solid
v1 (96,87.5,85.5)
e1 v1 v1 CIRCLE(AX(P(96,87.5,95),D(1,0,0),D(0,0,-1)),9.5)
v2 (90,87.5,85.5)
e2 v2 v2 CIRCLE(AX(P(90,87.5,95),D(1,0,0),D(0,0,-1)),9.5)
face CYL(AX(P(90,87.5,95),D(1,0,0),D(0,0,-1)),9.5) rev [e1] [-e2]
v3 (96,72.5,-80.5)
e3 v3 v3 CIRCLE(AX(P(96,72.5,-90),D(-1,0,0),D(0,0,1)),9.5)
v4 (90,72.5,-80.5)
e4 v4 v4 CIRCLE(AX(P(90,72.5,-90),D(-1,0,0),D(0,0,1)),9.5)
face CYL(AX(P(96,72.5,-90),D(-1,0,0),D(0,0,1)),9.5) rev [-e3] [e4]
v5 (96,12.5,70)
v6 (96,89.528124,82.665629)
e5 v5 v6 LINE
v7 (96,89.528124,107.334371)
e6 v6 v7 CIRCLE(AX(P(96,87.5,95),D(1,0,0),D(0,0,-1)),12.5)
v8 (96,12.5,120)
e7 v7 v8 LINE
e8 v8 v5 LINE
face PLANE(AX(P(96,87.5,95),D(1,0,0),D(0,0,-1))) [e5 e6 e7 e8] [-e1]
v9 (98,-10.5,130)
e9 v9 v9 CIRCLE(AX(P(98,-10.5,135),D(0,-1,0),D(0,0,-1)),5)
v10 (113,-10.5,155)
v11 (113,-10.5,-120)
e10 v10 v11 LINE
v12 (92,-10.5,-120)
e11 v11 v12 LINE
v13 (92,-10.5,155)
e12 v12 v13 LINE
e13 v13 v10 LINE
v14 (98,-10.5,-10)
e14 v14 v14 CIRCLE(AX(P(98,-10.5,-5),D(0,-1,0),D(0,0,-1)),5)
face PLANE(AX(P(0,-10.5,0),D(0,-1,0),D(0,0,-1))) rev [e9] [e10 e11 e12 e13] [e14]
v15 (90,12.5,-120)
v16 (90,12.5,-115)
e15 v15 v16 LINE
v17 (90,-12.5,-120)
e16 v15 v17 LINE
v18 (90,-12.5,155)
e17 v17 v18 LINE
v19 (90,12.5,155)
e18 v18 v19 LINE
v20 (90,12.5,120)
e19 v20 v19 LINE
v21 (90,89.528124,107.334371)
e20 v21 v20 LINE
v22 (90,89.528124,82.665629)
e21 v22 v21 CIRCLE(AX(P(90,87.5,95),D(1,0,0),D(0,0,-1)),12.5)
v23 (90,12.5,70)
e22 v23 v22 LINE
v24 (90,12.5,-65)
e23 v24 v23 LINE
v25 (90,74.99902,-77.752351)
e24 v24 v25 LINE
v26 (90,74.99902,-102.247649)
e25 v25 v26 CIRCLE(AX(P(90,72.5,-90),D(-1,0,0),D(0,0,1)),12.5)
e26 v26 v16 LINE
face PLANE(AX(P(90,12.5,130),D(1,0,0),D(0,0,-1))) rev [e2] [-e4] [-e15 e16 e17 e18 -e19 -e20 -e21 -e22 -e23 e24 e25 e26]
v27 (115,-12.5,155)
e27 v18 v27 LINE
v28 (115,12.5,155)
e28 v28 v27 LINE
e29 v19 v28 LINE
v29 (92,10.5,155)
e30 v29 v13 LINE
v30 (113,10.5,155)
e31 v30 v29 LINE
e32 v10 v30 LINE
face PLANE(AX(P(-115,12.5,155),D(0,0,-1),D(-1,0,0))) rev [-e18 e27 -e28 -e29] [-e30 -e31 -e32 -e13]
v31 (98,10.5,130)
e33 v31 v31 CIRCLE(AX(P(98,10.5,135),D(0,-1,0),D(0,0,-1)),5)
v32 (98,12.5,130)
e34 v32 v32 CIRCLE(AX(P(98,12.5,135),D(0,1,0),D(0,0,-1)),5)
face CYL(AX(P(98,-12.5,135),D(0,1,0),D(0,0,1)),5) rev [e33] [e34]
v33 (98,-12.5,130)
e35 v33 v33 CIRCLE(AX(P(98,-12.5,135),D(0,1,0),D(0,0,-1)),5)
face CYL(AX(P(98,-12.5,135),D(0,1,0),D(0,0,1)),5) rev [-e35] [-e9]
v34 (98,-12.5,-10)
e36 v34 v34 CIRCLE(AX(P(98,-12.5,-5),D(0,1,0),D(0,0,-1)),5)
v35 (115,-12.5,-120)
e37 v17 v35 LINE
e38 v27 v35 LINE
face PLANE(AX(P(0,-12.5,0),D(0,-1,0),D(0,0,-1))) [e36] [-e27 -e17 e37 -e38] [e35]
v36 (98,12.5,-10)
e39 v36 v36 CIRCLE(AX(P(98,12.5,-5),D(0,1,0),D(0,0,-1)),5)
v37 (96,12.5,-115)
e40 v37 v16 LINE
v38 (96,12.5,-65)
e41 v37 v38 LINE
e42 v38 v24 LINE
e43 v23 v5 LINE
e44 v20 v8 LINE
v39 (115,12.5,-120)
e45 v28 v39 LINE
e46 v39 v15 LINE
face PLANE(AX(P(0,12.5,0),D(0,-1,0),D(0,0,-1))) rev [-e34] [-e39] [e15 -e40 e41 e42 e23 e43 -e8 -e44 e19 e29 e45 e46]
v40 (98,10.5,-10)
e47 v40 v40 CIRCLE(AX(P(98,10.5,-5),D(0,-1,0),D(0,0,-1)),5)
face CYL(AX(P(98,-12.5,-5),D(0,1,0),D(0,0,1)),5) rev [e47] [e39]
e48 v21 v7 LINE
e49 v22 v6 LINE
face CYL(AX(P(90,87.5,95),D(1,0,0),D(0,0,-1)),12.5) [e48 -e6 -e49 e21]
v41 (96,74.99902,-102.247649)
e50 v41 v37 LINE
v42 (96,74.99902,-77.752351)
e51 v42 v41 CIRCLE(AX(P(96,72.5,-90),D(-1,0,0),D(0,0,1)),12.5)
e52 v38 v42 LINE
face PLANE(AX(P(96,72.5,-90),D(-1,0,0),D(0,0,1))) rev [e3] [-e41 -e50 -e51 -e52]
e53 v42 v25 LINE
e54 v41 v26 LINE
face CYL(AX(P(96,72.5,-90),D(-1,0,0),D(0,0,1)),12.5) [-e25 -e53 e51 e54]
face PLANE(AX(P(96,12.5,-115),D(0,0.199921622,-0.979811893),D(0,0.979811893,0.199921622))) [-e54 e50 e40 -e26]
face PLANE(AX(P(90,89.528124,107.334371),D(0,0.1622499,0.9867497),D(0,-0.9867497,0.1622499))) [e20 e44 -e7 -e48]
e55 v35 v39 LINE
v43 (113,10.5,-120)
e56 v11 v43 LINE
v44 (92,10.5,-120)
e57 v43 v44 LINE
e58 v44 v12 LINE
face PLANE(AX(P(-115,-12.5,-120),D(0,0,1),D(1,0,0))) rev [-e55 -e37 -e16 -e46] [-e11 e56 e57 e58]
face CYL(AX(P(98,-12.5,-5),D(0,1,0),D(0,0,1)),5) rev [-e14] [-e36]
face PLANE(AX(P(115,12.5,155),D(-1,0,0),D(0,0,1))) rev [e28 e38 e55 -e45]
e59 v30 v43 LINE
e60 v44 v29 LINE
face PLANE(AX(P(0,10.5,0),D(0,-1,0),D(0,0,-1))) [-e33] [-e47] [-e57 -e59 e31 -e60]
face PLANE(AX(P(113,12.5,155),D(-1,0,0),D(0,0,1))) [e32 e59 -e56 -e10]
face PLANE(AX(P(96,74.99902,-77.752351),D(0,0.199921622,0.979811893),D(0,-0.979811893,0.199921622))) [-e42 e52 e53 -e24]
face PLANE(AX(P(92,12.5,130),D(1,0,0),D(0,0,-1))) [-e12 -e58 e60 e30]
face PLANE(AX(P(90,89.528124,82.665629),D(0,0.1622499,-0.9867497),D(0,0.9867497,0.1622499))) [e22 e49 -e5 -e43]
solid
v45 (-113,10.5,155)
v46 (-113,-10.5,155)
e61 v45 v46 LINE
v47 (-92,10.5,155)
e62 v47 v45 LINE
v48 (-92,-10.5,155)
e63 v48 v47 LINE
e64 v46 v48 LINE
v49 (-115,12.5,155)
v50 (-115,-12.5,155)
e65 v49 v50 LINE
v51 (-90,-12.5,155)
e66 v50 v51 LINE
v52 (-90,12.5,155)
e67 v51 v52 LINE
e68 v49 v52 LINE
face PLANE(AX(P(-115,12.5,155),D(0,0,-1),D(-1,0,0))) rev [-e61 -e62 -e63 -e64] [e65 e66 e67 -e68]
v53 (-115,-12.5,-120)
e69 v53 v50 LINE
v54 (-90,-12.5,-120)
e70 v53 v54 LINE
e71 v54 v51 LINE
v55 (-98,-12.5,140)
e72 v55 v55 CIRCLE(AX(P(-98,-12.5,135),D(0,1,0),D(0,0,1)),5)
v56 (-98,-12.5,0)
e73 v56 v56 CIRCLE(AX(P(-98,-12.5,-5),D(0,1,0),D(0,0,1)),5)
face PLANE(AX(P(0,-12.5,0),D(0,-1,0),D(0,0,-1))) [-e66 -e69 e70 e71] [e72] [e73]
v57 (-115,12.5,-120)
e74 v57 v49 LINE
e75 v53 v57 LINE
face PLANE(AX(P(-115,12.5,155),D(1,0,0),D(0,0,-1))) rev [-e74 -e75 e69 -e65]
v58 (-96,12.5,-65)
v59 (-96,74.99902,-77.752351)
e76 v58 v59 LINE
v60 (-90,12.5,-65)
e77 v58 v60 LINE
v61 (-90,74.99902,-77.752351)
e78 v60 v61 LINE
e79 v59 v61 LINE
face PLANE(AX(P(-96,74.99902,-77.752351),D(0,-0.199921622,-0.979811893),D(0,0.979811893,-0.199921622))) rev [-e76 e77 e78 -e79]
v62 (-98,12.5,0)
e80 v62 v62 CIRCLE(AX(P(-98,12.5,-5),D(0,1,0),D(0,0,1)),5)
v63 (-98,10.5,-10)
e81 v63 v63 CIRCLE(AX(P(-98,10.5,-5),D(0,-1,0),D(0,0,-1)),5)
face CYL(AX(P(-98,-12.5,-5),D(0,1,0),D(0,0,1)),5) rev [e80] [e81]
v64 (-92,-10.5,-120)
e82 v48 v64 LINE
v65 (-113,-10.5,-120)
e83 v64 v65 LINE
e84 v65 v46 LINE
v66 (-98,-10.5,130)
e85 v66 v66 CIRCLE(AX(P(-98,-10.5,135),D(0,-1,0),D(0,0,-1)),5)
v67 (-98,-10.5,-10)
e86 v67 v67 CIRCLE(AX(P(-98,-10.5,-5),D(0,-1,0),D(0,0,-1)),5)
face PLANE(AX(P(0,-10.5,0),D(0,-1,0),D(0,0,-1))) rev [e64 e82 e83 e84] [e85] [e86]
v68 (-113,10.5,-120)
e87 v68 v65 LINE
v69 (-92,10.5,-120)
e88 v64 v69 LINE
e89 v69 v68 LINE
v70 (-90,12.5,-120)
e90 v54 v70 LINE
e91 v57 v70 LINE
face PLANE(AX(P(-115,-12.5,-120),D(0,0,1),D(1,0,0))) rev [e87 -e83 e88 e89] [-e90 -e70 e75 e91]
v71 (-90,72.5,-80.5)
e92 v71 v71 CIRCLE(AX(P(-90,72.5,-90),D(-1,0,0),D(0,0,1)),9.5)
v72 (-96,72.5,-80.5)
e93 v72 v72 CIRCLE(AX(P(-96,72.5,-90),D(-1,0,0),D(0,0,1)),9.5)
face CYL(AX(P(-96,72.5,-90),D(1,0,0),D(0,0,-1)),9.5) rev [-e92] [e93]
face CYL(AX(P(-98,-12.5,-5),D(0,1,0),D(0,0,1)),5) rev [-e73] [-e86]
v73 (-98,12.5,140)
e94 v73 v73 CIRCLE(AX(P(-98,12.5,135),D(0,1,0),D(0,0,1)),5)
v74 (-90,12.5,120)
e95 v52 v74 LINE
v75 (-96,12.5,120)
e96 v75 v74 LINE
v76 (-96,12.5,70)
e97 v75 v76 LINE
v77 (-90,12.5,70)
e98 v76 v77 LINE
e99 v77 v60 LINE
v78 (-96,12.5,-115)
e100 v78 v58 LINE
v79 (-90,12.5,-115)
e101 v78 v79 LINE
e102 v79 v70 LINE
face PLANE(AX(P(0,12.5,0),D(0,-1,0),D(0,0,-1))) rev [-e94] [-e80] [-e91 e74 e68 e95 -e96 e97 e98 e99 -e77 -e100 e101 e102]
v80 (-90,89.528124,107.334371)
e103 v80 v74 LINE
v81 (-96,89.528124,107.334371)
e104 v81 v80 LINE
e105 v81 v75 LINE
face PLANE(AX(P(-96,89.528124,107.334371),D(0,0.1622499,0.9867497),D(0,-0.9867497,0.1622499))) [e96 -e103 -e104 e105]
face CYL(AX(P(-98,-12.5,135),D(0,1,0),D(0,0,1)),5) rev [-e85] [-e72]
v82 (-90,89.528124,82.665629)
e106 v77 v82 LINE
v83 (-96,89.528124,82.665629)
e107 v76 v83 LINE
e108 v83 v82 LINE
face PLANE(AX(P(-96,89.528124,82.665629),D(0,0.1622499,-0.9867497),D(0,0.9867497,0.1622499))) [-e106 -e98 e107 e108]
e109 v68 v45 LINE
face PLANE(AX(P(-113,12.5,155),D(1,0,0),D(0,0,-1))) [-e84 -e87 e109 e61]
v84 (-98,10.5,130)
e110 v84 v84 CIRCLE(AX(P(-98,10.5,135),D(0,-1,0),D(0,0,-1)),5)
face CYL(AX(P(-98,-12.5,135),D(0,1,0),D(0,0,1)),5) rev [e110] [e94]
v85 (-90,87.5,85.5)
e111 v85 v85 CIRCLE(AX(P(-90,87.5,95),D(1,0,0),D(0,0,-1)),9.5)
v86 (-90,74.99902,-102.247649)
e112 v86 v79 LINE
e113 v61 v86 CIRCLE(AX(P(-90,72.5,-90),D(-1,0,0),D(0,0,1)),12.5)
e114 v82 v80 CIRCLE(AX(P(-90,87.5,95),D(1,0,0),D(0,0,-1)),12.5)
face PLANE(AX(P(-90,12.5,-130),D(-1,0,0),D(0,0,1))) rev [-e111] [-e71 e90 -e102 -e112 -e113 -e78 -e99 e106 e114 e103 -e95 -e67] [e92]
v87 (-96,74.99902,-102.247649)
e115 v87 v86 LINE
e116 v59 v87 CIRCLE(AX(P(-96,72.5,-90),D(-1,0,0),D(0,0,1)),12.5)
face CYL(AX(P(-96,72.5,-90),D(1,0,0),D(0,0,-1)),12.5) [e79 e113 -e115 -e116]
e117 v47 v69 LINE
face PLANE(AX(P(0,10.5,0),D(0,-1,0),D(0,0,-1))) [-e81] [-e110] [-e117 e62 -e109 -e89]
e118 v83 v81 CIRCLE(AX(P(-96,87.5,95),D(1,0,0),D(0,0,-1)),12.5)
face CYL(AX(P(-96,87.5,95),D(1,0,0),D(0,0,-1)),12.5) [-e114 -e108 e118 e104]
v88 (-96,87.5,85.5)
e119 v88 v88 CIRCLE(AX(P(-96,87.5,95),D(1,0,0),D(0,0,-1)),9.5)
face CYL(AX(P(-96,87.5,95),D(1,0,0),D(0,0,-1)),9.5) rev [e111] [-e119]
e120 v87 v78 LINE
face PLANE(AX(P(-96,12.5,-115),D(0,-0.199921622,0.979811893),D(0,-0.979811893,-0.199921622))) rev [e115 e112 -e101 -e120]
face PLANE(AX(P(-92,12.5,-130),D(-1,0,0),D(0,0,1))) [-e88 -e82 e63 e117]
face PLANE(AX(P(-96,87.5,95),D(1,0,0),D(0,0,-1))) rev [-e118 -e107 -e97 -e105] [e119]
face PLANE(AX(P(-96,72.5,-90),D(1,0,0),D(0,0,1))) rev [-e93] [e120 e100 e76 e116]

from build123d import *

# Parameters (mm, degrees)
BOSS_EXTRUDE1_DEPTH = 12.5
SHELL1_START        = -113
SHELL1_OUTLINE_W    = 21
SHELL1_OUTLINE_H    = 306
SHELL1_DEPTH        = 21
SHELL1_START_2      = 92
SHELL1_2_OUTLINE_W  = 21
SHELL1_2_OUTLINE_H  = 306
SHELL1_2_DEPTH      = 21
SHELL1_START_3      = -92
SHELL1_3_OUTLINE_W  = 21
SHELL1_3_OUTLINE_H  = 21
SHELL1_3_DEPTH      = 184
SKETCH6_R           = 9.5
BOSS_EXTRUDE5_DEPTH = 6
LPATTERN1_COUNT     = 2
LPATTERN1_PITCH     = 186
SKETCH9_R           = 9.5
BOSS_EXTRUDE6_DEPTH = 6
SKETCH10_W          = 180
SKETCH10_H          = 25
CUT_EXTRUDE1_DEPTH  = 212.910948278
SKETCH11_R          = 5
CUT_EXTRUDE2_DEPTH  = 212.910948278
SKETCH12_W          = 230
SKETCH12_H          = 35
CUT_EXTRUDE3_DEPTH  = 212.910948278
SKETCH13_W          = 21
SKETCH13_H          = 21
BOSS_EXTRUDE7_DEPTH = 2
SKETCH14_W          = 21
SKETCH14_H          = 21
BOSS_EXTRUDE8_DEPTH = 2
SKETCH16_W          = 21
SKETCH16_H          = 21
CUT_EXTRUDE5_DEPTH  = 275


# Read off the part's stored shape, not the designer's step: Shell1
with BuildPart() as part:
    # Sketch1 → Boss-Extrude1 (new, symmetric)
    with BuildSketch(Plane(origin=(0, 0, 0), x_dir=(1, 0, 0), z_dir=(0, 1, 0))):
        Polygon((-115, -155), (-115, 155), (-90, 155), (-90, 130), (-90, -130), (90, -130), (90, 130), (90, 155), (115, 155), (115, -155), align=None)
    extrude(amount=BOSS_EXTRUDE1_DEPTH, both=True)

    # Shell1 outline → Shell1 (cut)
    with BuildSketch(Plane.YZ.offset(SHELL1_START)):
        Rectangle(SHELL1_OUTLINE_W, SHELL1_OUTLINE_H)
    extrude(amount=SHELL1_DEPTH, mode=Mode.SUBTRACT)

    # Shell1 2 outline → Shell1 2 (cut)
    with BuildSketch(Plane.YZ.offset(SHELL1_START_2)):
        Rectangle(SHELL1_2_OUTLINE_W, SHELL1_2_OUTLINE_H)
    extrude(amount=SHELL1_2_DEPTH, mode=Mode.SUBTRACT)

    # Shell1 3 outline → Shell1 3 (cut)
    with BuildSketch(Plane.YZ.offset(SHELL1_START_3)):
        with Locations((0, 142.5)):
            Rectangle(SHELL1_3_OUTLINE_W, SHELL1_3_OUTLINE_H)
    extrude(amount=SHELL1_3_DEPTH, mode=Mode.SUBTRACT)

    # Sketch6 → Boss-Extrude5 (add)
    with BuildSketch(Plane(origin=(-90, 0, 0), x_dir=(0, 0, -1), z_dir=(1, 0, 0))):
        with BuildLine():
            Line((-107.334371247, 89.528123749), (-120, 12.5))
            Line((-120, 12.5), (-70, 12.5))
            Line((-70, 12.5), (-82.665628753, 89.528123749))
            ThreePointArc((-82.665628753, 89.528123749), (-95, 100), (-107.334371247, 89.528123749))
        make_face()
        with Locations((-95, 87.5)):
            Circle(SKETCH6_R, mode=Mode.SUBTRACT)
    boss_extrude5 = extrude(amount=-BOSS_EXTRUDE5_DEPTH)

    # LPattern1: Boss-Extrude5 ×2
    with Locations(*[(i * LPATTERN1_PITCH, 0, 0) for i in range(1, LPATTERN1_COUNT)]):
        add(boss_extrude5)

    # Sketch9 → Boss-Extrude6 (add)
    with BuildSketch(Plane.ZY.offset(-90)):
        with BuildLine():
            Line((-77.752351341, 74.999020274), (-65, 12.5))
            Line((-65, 12.5), (-115, 12.5))
            Line((-115, 12.5), (-102.247648659, 74.999020274))
            ThreePointArc((-102.247648659, 74.999020274), (-90, 85), (-77.752351341, 74.999020274))
        make_face()
        with Locations((-90, 72.5)):
            Circle(SKETCH9_R, mode=Mode.SUBTRACT)
    boss_extrude6 = extrude(amount=-BOSS_EXTRUDE6_DEPTH)

    # Mirror1: Boss-Extrude6 across plane
    add(boss_extrude6.mirror(Plane(origin=(0, 0, 0), x_dir=(0, 0, 1), z_dir=(1, 0, 0))))

    # Sketch10 → Cut-Extrude1 (cut, through all)
    with BuildSketch(Plane(origin=(0, 12.5, 0), x_dir=(1, 0, 0), z_dir=(0, 1, 0))):
        with Locations((0, -142.5)):
            Rectangle(SKETCH10_W, SKETCH10_H)
    extrude(amount=-CUT_EXTRUDE1_DEPTH, mode=Mode.SUBTRACT)


with BuildPart() as cut_extrude1_piece_1:
    # of the separate pieces the step leaves, piece 1, a body of its own (cut_extrude1_pieces)
    add(part.part.solids().sort_by_distance((115, -12.5, 155))[0])


with BuildPart() as cut_extrude1_piece_2:
    # of the separate pieces the step leaves, piece 2, a body of its own (cut_extrude1_pieces)
    add(part.part.solids().sort_by_distance((-115, -12.5, 155))[0])


with BuildPart() as cut_extrude2_tool:
    # Sketch11 → Cut-Extrude2 (new, through all)
    with BuildSketch(Plane(origin=(0, 12.5, 0), x_dir=(1, 0, 0), z_dir=(0, 1, 0))):
        with Locations(Location((-98, 5, 0), (0, 0, 270))):
            Circle(SKETCH11_R)
        with Locations(Location((-98, -135, 0), (0, 0, 270))):
            Circle(SKETCH11_R)
        with Locations(Location((98, -135, 0), (0, 0, 90))):
            Circle(SKETCH11_R)
        with Locations(Location((98, 5, 0), (0, 0, 90))):
            Circle(SKETCH11_R)
    extrude(amount=-CUT_EXTRUDE2_DEPTH)


with BuildPart() as cut_extrude1_piece_1_1:
    add(cut_extrude1_piece_1.part)

    # Cut-Extrude2: cut by cut_extrude2_tool
    add(cut_extrude2_tool.part, mode=Mode.SUBTRACT)


with BuildPart() as cut_extrude1_piece_2_1:
    add(cut_extrude1_piece_2.part)

    # Cut-Extrude2: cut by cut_extrude2_tool
    add(cut_extrude2_tool.part, mode=Mode.SUBTRACT)


with BuildPart() as cut_extrude3_tool:
    # Sketch12 → Cut-Extrude3 (new, through all)
    with BuildSketch(Plane(origin=(0, 12.5, 0), x_dir=(1, 0, 0), z_dir=(0, 1, 0))):
        with Locations((0, 137.5)):
            Rectangle(SKETCH12_W, SKETCH12_H)
    extrude(amount=-CUT_EXTRUDE3_DEPTH)


with BuildPart() as cut_extrude1_piece_1_2:
    add(cut_extrude1_piece_1_1.part)

    # Cut-Extrude3: cut by cut_extrude3_tool
    add(cut_extrude3_tool.part, mode=Mode.SUBTRACT)

    # Sketch13 → Boss-Extrude7 (add)
    with BuildSketch(Plane(origin=(92, 0, 0), x_dir=(0, 0, -1), z_dir=(1, 0, 0))):
        with Locations((-142.5, 0)):
            Rectangle(SKETCH13_W, SKETCH13_H)
    extrude(amount=-BOSS_EXTRUDE7_DEPTH)


with BuildPart() as cut_extrude1_piece_2_2:
    add(cut_extrude1_piece_2_1.part)

    # Cut-Extrude3: cut by cut_extrude3_tool
    add(cut_extrude3_tool.part, mode=Mode.SUBTRACT)

    # Sketch14 → Boss-Extrude8 (add)
    with BuildSketch(Plane.ZY.offset(92)):
        with Locations((142.5, 0)):
            Rectangle(SKETCH14_W, SKETCH14_H)
    extrude(amount=-BOSS_EXTRUDE8_DEPTH)


with BuildPart() as cut_extrude5_tool:
    # Sketch16 → Cut-Extrude5 (new body)
    with BuildSketch(Plane(origin=(0, 0, -120), x_dir=(-1, 0, 0), z_dir=(0, 0, -1))):
        with Locations((-102.5, 0)):
            Rectangle(SKETCH16_W, SKETCH16_H)
        with Locations((102.5, 0)):
            Rectangle(SKETCH16_W, SKETCH16_H)
    extrude(amount=-CUT_EXTRUDE5_DEPTH)


with BuildPart() as cut_extrude1_piece_1_3:
    add(cut_extrude1_piece_1_2.part)

    # Cut-Extrude5: cut by cut_extrude5_tool
    add(cut_extrude5_tool.part, mode=Mode.SUBTRACT)


with BuildPart() as cut_extrude1_piece_2_3:
    add(cut_extrude1_piece_2_2.part)

    # Cut-Extrude5: cut by cut_extrude5_tool
    add(cut_extrude5_tool.part, mode=Mode.SUBTRACT)


solid = Compound([cut_extrude1_piece_1_3.part, cut_extrude1_piece_2_3.part])
